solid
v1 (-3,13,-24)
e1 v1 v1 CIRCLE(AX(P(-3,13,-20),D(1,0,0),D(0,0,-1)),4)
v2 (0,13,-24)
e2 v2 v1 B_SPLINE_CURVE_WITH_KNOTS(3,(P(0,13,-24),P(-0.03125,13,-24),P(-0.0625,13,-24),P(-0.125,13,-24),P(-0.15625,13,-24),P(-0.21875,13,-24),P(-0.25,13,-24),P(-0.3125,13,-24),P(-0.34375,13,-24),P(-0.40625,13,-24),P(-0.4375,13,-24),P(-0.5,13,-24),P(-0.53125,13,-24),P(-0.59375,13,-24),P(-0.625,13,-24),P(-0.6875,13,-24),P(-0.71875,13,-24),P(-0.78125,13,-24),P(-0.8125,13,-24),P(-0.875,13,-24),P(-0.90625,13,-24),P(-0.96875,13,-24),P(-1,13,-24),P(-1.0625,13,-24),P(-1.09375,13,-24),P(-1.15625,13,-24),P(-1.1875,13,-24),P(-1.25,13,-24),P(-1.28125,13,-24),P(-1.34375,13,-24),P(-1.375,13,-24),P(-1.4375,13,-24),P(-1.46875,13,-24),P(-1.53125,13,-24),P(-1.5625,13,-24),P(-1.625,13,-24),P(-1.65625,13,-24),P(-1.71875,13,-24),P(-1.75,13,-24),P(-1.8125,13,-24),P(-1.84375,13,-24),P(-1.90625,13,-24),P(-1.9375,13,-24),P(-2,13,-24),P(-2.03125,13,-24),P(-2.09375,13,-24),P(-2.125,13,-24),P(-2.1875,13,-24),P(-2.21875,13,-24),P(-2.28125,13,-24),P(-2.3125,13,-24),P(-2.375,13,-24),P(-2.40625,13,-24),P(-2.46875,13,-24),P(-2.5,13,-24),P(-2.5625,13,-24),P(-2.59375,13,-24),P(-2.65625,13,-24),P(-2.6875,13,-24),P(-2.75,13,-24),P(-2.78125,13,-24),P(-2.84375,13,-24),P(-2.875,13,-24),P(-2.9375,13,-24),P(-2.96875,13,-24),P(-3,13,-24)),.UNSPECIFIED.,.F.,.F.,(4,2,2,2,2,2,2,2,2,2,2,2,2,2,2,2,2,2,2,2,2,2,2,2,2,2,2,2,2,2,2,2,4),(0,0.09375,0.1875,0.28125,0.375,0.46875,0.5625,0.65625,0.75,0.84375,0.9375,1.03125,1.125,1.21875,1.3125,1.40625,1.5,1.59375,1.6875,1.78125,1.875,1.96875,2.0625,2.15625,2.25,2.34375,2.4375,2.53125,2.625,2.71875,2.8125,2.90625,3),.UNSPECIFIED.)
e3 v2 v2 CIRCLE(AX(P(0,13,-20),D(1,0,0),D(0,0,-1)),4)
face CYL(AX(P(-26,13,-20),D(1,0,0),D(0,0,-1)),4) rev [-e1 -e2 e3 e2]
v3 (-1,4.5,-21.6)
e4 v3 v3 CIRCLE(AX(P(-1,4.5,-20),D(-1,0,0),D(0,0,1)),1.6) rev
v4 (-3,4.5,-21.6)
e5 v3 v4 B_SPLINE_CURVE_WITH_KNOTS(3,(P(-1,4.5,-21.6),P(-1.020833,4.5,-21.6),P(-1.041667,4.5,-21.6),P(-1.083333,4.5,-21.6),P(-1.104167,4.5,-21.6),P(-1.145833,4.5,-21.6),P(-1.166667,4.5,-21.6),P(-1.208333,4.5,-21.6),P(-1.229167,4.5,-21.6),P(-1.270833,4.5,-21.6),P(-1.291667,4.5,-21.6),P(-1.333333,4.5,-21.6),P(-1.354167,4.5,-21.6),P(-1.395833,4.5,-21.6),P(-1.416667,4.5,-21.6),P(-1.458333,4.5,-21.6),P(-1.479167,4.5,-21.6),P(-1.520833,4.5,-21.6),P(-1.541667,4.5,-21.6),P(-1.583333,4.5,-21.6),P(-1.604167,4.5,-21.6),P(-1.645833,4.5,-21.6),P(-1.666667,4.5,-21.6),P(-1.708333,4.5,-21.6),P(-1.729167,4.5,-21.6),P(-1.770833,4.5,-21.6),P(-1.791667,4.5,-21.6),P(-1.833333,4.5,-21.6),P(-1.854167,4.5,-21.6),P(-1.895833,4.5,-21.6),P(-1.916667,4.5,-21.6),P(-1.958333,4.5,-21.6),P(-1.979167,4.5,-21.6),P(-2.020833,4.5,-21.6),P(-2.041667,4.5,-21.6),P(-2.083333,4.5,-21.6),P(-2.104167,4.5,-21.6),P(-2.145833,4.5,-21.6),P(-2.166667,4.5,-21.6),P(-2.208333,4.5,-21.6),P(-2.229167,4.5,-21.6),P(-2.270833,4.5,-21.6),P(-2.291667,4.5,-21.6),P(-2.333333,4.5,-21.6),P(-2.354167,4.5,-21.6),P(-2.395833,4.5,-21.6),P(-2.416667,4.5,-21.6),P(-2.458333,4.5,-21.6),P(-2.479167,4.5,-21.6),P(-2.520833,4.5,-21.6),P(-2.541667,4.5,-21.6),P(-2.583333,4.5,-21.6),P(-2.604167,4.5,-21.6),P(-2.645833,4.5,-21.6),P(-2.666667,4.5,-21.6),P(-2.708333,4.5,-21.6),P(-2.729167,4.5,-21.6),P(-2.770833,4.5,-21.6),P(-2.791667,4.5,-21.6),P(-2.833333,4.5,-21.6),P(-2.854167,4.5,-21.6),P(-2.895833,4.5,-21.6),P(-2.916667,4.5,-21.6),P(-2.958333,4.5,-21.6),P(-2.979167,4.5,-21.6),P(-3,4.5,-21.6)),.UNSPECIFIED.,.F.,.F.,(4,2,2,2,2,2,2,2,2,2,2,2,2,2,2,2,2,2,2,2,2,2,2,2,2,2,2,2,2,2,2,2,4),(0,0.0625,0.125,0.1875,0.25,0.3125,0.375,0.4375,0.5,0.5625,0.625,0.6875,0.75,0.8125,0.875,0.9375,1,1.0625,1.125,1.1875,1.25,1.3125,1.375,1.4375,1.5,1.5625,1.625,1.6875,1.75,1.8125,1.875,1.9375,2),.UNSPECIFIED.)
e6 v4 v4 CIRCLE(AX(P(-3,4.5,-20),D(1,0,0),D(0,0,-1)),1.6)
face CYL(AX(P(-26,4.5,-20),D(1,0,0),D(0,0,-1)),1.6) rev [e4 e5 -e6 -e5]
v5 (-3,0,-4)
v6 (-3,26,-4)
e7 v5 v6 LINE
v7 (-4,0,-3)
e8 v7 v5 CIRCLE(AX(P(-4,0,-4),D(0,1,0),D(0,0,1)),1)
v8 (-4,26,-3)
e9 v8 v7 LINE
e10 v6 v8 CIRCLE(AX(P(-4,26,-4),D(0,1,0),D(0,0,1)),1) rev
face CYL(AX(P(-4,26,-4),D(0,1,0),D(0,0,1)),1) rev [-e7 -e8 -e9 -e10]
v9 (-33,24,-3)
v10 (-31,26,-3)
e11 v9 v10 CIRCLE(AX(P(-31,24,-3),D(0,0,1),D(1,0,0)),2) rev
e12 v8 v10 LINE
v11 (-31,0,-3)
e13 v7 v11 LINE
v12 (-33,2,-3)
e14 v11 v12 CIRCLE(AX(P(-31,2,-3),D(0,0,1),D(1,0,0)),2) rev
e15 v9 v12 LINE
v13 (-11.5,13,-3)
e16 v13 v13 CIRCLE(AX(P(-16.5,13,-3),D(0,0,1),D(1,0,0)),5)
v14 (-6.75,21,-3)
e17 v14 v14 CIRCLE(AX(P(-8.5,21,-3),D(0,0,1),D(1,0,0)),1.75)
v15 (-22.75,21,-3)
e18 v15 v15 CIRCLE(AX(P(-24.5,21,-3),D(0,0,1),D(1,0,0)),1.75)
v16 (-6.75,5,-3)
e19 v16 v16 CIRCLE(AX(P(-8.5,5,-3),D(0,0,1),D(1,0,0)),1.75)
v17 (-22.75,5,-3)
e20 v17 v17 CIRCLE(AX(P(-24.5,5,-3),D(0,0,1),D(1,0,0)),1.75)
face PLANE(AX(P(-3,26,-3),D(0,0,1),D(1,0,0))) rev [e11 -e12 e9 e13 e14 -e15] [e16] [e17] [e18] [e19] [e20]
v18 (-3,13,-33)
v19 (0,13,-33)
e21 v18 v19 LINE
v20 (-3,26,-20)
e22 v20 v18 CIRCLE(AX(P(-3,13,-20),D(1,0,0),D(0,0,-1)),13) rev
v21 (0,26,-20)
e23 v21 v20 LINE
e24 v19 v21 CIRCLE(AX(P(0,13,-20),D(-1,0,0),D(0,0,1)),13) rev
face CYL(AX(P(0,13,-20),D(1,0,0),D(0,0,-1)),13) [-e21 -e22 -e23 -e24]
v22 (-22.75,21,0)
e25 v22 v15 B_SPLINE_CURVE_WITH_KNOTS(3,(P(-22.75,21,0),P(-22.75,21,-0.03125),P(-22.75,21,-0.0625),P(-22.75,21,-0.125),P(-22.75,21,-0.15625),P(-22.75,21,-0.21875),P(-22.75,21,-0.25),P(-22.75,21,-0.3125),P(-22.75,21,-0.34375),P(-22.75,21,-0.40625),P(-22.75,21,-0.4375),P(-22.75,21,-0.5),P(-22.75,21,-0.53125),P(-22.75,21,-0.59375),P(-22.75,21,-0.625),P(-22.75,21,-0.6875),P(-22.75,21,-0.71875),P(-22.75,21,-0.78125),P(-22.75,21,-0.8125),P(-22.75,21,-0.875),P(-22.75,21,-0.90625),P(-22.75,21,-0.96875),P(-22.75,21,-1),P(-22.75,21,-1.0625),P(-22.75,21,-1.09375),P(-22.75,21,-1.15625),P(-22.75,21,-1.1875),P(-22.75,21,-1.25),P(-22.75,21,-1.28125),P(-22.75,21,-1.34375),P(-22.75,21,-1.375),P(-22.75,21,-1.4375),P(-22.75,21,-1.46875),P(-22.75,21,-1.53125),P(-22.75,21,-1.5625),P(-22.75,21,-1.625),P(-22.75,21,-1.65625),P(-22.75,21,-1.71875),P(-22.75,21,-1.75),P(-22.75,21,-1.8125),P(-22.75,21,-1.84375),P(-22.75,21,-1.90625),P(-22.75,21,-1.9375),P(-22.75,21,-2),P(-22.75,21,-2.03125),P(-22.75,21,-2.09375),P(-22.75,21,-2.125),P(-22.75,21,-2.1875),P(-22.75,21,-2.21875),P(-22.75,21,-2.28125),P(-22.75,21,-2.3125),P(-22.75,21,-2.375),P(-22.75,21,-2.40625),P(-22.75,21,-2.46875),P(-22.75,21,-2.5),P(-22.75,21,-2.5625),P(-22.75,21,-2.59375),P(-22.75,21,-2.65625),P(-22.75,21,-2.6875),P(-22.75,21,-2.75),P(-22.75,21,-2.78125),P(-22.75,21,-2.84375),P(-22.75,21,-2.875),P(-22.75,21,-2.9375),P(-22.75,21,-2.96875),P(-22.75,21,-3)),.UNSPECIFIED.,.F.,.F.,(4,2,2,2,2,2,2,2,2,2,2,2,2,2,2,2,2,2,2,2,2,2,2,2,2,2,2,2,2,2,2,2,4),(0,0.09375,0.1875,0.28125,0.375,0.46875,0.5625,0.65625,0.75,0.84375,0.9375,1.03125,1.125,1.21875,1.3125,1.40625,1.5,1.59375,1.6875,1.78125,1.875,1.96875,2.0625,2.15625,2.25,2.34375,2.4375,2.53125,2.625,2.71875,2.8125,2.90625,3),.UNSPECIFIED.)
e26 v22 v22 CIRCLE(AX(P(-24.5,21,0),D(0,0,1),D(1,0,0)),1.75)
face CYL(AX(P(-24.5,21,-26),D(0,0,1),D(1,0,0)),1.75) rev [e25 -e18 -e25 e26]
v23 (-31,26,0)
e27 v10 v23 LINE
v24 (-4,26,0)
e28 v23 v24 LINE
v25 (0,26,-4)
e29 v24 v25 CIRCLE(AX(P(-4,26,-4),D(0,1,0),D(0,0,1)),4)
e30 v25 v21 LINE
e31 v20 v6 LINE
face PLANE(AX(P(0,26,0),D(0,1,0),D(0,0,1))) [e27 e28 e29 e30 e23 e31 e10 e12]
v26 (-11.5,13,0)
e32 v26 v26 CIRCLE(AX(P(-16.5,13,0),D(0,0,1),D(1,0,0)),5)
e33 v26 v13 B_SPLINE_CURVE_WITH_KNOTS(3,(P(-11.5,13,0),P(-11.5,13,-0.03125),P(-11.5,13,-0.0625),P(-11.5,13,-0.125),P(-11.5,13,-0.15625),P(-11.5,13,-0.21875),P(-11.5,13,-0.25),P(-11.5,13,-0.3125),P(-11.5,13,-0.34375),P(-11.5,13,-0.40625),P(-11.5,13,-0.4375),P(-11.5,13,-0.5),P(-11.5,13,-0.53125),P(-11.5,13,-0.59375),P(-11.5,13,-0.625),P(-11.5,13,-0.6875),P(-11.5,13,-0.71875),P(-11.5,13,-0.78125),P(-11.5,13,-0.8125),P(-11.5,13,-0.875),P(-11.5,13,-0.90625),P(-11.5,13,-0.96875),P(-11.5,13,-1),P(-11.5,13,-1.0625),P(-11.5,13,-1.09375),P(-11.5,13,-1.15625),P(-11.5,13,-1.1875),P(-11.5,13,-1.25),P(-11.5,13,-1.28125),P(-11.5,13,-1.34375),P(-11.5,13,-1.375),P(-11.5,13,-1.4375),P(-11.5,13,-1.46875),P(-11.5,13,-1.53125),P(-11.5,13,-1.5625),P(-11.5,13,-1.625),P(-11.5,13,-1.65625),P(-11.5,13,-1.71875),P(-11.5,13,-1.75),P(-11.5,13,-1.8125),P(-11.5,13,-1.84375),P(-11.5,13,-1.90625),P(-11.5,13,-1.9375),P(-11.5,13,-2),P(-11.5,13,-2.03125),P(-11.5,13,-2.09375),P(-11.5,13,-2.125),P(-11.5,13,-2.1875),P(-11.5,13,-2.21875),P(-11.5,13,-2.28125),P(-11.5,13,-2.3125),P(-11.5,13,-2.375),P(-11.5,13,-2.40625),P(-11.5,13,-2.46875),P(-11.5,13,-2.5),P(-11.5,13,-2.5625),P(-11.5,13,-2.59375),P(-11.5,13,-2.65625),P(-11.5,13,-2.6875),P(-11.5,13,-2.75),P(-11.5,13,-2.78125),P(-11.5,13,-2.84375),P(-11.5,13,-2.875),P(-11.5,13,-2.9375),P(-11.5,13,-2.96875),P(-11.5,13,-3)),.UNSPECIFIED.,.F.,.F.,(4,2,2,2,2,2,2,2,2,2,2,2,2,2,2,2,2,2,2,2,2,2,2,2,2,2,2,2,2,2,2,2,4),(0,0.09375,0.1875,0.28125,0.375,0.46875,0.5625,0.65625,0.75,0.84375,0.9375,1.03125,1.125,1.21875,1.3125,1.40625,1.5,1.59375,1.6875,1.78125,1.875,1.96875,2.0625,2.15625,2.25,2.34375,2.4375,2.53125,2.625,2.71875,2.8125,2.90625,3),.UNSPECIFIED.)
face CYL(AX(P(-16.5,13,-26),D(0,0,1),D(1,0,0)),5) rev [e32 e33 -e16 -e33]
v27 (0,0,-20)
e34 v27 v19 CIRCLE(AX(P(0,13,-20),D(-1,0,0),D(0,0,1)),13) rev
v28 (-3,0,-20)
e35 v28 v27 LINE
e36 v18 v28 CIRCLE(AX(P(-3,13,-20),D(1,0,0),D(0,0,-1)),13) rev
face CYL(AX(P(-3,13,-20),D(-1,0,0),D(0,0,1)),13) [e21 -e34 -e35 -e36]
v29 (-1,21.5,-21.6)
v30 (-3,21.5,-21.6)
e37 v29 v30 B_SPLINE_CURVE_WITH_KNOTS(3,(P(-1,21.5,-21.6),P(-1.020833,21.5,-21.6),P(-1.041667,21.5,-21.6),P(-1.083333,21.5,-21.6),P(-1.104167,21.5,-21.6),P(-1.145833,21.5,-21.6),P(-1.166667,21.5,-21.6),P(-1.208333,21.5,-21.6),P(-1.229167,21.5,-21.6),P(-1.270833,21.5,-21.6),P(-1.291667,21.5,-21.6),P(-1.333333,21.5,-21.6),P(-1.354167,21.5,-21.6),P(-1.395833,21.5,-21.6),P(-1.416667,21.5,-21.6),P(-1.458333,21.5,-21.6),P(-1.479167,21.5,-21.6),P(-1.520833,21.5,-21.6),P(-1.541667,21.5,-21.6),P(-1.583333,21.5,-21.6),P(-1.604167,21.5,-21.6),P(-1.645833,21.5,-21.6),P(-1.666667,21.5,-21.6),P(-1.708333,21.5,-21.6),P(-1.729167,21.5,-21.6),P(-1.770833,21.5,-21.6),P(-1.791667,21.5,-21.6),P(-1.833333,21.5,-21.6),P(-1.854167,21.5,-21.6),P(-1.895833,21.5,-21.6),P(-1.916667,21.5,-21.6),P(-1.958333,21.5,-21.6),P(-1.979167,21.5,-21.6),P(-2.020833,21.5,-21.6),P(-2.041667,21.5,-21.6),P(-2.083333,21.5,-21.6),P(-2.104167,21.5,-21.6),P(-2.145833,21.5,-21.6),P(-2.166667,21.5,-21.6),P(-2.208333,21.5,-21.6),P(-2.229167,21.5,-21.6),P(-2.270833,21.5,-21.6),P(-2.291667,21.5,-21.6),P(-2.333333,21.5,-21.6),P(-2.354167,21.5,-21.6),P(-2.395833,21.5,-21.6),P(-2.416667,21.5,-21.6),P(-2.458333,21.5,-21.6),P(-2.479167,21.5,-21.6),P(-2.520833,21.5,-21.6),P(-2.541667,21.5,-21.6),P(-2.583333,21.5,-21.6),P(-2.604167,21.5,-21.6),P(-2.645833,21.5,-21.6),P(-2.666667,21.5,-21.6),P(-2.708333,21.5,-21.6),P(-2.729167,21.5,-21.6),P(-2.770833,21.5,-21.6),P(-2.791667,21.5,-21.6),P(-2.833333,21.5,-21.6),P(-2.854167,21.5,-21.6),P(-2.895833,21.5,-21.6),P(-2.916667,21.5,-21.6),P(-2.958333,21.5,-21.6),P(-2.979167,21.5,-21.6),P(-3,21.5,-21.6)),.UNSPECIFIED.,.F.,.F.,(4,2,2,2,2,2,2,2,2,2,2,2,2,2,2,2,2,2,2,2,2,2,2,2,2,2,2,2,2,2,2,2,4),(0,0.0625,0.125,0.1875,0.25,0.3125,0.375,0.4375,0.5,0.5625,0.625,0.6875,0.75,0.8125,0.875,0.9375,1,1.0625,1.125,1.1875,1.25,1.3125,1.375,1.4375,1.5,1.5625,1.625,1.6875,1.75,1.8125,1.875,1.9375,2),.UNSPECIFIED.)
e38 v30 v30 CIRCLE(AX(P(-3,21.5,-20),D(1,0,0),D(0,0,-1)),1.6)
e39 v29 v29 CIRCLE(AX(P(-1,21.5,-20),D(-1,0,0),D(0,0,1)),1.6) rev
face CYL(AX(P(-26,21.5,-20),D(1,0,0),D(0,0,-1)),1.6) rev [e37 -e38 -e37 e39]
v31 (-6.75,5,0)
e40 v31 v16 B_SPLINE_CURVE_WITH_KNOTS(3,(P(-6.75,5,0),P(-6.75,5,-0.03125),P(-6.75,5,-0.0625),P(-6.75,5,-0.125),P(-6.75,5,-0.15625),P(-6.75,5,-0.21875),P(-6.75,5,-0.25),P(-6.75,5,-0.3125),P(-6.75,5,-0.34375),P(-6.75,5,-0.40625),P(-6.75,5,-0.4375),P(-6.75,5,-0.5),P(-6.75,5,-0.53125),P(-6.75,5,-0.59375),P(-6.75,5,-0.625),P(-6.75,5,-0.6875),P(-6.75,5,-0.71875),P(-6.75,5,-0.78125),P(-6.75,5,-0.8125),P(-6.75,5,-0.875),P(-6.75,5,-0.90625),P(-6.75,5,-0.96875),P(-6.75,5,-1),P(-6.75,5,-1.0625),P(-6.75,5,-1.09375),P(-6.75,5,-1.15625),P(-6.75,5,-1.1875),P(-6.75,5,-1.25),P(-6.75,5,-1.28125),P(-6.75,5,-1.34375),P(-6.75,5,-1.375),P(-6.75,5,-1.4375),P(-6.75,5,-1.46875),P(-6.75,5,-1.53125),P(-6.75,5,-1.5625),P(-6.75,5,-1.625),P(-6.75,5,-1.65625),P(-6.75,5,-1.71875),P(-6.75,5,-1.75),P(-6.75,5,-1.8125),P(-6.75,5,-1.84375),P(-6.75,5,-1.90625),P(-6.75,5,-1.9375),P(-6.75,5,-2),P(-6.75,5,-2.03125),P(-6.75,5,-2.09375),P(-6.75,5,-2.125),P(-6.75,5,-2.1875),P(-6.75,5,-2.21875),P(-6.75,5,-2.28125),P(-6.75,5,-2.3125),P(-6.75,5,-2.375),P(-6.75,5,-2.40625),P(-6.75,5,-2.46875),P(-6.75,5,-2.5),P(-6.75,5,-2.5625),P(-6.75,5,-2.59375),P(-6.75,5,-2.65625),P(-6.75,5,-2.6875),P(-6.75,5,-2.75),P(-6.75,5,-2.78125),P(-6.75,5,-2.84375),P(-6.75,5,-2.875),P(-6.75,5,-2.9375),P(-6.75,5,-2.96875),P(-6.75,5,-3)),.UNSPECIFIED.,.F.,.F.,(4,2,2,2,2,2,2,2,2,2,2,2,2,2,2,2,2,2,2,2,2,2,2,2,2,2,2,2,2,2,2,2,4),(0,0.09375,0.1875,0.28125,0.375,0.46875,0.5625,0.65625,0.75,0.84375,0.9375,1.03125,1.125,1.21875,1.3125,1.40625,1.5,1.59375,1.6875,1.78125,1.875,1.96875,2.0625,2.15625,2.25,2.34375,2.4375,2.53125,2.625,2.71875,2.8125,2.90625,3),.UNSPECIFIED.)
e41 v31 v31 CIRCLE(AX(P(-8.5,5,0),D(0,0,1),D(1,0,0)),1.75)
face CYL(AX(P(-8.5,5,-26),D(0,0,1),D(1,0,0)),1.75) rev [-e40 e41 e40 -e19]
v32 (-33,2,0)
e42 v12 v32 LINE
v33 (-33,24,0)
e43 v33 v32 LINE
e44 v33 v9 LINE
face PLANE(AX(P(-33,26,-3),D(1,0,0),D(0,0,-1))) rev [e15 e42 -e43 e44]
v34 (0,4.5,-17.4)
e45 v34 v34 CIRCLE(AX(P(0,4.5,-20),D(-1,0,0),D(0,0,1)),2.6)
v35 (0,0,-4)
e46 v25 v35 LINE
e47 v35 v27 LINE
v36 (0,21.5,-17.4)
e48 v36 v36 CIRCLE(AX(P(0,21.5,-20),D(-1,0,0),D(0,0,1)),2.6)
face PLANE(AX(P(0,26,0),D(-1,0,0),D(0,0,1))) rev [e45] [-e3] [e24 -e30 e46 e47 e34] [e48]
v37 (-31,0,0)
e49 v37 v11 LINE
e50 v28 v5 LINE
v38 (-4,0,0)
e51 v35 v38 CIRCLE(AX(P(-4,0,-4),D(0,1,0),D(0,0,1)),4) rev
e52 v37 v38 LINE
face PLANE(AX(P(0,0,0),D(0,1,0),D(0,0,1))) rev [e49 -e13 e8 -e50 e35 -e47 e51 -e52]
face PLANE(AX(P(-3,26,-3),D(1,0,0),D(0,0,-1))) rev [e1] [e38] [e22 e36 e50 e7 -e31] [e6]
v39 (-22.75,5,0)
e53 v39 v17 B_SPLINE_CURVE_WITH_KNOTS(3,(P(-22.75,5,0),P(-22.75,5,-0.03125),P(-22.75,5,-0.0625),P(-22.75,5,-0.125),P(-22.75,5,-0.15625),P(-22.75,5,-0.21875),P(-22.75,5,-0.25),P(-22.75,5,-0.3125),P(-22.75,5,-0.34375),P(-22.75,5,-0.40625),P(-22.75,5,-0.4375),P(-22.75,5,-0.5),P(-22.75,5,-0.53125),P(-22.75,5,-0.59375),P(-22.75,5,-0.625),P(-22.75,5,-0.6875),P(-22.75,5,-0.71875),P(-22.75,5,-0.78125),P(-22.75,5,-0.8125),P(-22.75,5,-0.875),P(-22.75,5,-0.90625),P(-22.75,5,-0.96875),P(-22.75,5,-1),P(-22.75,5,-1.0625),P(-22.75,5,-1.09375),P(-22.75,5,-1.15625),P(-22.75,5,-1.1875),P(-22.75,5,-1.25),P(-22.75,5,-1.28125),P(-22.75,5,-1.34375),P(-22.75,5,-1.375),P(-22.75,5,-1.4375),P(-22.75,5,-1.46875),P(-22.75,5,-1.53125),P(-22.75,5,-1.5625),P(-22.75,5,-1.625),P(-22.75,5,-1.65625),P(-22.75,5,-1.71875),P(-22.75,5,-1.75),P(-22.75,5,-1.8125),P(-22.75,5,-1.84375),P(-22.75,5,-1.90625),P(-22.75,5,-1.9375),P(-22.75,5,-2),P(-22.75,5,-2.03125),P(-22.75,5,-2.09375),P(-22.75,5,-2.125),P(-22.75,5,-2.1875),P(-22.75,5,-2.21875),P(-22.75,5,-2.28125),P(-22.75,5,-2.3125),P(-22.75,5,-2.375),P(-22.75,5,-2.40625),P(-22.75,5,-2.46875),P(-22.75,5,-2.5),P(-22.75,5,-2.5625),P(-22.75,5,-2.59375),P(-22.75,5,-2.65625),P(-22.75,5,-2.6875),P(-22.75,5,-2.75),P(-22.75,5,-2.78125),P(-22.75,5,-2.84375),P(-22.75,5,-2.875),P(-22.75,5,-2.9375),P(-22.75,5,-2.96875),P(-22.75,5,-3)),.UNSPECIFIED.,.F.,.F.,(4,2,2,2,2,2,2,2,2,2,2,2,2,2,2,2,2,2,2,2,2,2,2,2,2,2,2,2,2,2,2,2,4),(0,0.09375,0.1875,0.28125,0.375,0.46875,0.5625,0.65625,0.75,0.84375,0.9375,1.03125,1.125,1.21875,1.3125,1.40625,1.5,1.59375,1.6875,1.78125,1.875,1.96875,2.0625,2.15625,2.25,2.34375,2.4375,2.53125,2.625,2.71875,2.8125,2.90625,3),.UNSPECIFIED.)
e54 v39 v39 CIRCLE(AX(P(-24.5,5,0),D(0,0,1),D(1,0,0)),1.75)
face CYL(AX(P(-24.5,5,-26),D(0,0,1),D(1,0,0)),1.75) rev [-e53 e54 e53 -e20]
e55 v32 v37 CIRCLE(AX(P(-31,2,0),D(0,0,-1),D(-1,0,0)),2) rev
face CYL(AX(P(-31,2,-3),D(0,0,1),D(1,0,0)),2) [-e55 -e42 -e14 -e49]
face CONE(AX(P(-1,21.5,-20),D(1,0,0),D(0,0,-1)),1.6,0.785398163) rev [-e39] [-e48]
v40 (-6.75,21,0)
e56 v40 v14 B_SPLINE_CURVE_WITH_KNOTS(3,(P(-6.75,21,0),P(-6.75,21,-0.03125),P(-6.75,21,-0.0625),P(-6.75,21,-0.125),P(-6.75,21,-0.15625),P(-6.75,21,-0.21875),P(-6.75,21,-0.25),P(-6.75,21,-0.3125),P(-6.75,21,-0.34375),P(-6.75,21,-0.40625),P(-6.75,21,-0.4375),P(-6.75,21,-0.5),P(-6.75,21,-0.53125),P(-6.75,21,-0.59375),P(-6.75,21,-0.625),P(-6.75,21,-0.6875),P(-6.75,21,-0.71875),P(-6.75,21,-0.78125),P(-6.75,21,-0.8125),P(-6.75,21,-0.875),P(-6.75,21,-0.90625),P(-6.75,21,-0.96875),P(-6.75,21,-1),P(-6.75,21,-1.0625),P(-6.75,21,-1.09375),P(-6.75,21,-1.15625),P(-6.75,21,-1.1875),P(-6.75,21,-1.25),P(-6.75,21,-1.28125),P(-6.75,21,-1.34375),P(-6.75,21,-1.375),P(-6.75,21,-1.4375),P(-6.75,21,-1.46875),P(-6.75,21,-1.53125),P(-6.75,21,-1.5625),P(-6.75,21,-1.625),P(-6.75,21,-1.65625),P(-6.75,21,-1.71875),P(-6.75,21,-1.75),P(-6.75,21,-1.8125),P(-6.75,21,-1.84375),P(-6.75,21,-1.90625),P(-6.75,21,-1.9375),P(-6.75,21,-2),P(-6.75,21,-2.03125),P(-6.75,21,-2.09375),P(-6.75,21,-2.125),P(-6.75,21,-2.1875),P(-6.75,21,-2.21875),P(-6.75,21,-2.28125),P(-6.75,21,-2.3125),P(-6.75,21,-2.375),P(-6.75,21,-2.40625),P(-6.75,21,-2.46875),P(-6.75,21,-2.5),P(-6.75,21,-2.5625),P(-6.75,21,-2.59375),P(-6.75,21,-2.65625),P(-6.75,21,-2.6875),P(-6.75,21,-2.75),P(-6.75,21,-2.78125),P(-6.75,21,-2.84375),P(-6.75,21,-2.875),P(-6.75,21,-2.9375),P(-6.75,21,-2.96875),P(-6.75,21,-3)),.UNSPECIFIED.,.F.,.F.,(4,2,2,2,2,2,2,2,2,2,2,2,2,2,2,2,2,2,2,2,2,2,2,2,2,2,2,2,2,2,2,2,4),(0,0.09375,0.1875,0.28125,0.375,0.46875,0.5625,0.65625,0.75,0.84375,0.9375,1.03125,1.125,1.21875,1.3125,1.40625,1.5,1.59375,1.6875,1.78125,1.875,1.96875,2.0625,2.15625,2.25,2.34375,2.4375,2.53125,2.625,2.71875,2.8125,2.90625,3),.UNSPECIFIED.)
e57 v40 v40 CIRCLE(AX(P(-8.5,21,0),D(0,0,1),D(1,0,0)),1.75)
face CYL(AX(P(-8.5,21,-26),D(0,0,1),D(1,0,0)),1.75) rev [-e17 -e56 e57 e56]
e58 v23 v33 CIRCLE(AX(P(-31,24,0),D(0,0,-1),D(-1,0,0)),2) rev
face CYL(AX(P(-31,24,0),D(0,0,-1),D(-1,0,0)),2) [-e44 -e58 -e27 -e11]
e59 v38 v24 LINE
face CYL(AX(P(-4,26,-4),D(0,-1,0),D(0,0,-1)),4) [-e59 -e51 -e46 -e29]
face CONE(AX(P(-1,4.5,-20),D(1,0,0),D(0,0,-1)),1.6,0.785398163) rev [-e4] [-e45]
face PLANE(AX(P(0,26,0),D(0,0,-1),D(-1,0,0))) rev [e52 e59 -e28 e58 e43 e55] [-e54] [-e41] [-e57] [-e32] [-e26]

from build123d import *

# Parameters (mm, degrees)
BOSS_EXTRUDE1_DEPTH = 26
SKETCH2_R           = 5
SKETCH2_R_2         = 1.75
CUT_EXTRUDE1_DEPTH  = 26
FILLET1_R           = 13
SKETCH4_R           = 4
SKETCH4_R_2         = 1.6
CUT_EXTRUDE2_DEPTH  = 26
FILLET2_R           = 1
FILLET3_R           = 4
FILLET4_R           = 2
CHAMFER1_SIZE       = 1


with BuildPart() as part:
    # Sketch1 → Boss-Extrude1 (new body)
    with BuildSketch(Plane(origin=(0, 0, 0), x_dir=(1, 0, 0), z_dir=(0, 1, 0))):
        Polygon((0, 0), (0, 33), (-3, 33), (-3, 3), (-33, 3), (-33, 0), align=None)
    extrude(amount=BOSS_EXTRUDE1_DEPTH)

    # Sketch2 → Cut-Extrude1 (cut)
    with BuildSketch(Plane.XY):
        with Locations((-16.5, 13)):
            Circle(SKETCH2_R)
        with Locations((-24.5, 21)):
            Circle(SKETCH2_R_2)
        with Locations((-8.5, 21)):
            Circle(SKETCH2_R_2)
        with Locations((-8.5, 5)):
            Circle(SKETCH2_R_2)
        with Locations((-24.5, 5)):
            Circle(SKETCH2_R_2)
    extrude(amount=-CUT_EXTRUDE1_DEPTH, mode=Mode.SUBTRACT)

    # Fillet1
    fillet1_edges = [part.edges().sort_by_distance(p)[0] for p in [
        (-1.5, 0, -33),
        (-1.5, 26, -33),
    ]]
    fillet(fillet1_edges, radius=FILLET1_R - 0.0001)  # a hair under: the kernel refuses the full size

    # Sketch4 → Cut-Extrude2 (cut)
    with BuildSketch(Plane(origin=(0, 0, 0), x_dir=(0, 0, -1), z_dir=(1, 0, 0))):
        with Locations((20, 13)):
            Circle(SKETCH4_R)
        with Locations((20, 21.5)):
            Circle(SKETCH4_R_2)
        with Locations((20, 4.5)):
            Circle(SKETCH4_R_2)
    extrude(amount=-CUT_EXTRUDE2_DEPTH, mode=Mode.SUBTRACT)

    # Fillet2
    fillet2_edges = [part.edges().sort_by_distance(p)[0] for p in [
        (-3, 13, -3),
    ]]
    fillet(fillet2_edges, radius=FILLET2_R)

    # Fillet3
    fillet3_edges = [part.edges().sort_by_distance(p)[0] for p in [
        (0, 13, 0),
    ]]
    fillet(fillet3_edges, radius=FILLET3_R)

    # Fillet4
    fillet4_edges = [part.edges().sort_by_distance(p)[0] for p in [
        (-33, 26, -1.5),
        (-33, 0, -1.5),
    ]]
    fillet(fillet4_edges, radius=FILLET4_R)

    # Chamfer1
    chamfer1_edges = [part.edges().sort_by_distance(p)[0] for p in [
        (0, 4.5, -18.4),
        (0, 21.5, -18.4),
    ]]
    chamfer(chamfer1_edges, length=CHAMFER1_SIZE)


solid = part.part
